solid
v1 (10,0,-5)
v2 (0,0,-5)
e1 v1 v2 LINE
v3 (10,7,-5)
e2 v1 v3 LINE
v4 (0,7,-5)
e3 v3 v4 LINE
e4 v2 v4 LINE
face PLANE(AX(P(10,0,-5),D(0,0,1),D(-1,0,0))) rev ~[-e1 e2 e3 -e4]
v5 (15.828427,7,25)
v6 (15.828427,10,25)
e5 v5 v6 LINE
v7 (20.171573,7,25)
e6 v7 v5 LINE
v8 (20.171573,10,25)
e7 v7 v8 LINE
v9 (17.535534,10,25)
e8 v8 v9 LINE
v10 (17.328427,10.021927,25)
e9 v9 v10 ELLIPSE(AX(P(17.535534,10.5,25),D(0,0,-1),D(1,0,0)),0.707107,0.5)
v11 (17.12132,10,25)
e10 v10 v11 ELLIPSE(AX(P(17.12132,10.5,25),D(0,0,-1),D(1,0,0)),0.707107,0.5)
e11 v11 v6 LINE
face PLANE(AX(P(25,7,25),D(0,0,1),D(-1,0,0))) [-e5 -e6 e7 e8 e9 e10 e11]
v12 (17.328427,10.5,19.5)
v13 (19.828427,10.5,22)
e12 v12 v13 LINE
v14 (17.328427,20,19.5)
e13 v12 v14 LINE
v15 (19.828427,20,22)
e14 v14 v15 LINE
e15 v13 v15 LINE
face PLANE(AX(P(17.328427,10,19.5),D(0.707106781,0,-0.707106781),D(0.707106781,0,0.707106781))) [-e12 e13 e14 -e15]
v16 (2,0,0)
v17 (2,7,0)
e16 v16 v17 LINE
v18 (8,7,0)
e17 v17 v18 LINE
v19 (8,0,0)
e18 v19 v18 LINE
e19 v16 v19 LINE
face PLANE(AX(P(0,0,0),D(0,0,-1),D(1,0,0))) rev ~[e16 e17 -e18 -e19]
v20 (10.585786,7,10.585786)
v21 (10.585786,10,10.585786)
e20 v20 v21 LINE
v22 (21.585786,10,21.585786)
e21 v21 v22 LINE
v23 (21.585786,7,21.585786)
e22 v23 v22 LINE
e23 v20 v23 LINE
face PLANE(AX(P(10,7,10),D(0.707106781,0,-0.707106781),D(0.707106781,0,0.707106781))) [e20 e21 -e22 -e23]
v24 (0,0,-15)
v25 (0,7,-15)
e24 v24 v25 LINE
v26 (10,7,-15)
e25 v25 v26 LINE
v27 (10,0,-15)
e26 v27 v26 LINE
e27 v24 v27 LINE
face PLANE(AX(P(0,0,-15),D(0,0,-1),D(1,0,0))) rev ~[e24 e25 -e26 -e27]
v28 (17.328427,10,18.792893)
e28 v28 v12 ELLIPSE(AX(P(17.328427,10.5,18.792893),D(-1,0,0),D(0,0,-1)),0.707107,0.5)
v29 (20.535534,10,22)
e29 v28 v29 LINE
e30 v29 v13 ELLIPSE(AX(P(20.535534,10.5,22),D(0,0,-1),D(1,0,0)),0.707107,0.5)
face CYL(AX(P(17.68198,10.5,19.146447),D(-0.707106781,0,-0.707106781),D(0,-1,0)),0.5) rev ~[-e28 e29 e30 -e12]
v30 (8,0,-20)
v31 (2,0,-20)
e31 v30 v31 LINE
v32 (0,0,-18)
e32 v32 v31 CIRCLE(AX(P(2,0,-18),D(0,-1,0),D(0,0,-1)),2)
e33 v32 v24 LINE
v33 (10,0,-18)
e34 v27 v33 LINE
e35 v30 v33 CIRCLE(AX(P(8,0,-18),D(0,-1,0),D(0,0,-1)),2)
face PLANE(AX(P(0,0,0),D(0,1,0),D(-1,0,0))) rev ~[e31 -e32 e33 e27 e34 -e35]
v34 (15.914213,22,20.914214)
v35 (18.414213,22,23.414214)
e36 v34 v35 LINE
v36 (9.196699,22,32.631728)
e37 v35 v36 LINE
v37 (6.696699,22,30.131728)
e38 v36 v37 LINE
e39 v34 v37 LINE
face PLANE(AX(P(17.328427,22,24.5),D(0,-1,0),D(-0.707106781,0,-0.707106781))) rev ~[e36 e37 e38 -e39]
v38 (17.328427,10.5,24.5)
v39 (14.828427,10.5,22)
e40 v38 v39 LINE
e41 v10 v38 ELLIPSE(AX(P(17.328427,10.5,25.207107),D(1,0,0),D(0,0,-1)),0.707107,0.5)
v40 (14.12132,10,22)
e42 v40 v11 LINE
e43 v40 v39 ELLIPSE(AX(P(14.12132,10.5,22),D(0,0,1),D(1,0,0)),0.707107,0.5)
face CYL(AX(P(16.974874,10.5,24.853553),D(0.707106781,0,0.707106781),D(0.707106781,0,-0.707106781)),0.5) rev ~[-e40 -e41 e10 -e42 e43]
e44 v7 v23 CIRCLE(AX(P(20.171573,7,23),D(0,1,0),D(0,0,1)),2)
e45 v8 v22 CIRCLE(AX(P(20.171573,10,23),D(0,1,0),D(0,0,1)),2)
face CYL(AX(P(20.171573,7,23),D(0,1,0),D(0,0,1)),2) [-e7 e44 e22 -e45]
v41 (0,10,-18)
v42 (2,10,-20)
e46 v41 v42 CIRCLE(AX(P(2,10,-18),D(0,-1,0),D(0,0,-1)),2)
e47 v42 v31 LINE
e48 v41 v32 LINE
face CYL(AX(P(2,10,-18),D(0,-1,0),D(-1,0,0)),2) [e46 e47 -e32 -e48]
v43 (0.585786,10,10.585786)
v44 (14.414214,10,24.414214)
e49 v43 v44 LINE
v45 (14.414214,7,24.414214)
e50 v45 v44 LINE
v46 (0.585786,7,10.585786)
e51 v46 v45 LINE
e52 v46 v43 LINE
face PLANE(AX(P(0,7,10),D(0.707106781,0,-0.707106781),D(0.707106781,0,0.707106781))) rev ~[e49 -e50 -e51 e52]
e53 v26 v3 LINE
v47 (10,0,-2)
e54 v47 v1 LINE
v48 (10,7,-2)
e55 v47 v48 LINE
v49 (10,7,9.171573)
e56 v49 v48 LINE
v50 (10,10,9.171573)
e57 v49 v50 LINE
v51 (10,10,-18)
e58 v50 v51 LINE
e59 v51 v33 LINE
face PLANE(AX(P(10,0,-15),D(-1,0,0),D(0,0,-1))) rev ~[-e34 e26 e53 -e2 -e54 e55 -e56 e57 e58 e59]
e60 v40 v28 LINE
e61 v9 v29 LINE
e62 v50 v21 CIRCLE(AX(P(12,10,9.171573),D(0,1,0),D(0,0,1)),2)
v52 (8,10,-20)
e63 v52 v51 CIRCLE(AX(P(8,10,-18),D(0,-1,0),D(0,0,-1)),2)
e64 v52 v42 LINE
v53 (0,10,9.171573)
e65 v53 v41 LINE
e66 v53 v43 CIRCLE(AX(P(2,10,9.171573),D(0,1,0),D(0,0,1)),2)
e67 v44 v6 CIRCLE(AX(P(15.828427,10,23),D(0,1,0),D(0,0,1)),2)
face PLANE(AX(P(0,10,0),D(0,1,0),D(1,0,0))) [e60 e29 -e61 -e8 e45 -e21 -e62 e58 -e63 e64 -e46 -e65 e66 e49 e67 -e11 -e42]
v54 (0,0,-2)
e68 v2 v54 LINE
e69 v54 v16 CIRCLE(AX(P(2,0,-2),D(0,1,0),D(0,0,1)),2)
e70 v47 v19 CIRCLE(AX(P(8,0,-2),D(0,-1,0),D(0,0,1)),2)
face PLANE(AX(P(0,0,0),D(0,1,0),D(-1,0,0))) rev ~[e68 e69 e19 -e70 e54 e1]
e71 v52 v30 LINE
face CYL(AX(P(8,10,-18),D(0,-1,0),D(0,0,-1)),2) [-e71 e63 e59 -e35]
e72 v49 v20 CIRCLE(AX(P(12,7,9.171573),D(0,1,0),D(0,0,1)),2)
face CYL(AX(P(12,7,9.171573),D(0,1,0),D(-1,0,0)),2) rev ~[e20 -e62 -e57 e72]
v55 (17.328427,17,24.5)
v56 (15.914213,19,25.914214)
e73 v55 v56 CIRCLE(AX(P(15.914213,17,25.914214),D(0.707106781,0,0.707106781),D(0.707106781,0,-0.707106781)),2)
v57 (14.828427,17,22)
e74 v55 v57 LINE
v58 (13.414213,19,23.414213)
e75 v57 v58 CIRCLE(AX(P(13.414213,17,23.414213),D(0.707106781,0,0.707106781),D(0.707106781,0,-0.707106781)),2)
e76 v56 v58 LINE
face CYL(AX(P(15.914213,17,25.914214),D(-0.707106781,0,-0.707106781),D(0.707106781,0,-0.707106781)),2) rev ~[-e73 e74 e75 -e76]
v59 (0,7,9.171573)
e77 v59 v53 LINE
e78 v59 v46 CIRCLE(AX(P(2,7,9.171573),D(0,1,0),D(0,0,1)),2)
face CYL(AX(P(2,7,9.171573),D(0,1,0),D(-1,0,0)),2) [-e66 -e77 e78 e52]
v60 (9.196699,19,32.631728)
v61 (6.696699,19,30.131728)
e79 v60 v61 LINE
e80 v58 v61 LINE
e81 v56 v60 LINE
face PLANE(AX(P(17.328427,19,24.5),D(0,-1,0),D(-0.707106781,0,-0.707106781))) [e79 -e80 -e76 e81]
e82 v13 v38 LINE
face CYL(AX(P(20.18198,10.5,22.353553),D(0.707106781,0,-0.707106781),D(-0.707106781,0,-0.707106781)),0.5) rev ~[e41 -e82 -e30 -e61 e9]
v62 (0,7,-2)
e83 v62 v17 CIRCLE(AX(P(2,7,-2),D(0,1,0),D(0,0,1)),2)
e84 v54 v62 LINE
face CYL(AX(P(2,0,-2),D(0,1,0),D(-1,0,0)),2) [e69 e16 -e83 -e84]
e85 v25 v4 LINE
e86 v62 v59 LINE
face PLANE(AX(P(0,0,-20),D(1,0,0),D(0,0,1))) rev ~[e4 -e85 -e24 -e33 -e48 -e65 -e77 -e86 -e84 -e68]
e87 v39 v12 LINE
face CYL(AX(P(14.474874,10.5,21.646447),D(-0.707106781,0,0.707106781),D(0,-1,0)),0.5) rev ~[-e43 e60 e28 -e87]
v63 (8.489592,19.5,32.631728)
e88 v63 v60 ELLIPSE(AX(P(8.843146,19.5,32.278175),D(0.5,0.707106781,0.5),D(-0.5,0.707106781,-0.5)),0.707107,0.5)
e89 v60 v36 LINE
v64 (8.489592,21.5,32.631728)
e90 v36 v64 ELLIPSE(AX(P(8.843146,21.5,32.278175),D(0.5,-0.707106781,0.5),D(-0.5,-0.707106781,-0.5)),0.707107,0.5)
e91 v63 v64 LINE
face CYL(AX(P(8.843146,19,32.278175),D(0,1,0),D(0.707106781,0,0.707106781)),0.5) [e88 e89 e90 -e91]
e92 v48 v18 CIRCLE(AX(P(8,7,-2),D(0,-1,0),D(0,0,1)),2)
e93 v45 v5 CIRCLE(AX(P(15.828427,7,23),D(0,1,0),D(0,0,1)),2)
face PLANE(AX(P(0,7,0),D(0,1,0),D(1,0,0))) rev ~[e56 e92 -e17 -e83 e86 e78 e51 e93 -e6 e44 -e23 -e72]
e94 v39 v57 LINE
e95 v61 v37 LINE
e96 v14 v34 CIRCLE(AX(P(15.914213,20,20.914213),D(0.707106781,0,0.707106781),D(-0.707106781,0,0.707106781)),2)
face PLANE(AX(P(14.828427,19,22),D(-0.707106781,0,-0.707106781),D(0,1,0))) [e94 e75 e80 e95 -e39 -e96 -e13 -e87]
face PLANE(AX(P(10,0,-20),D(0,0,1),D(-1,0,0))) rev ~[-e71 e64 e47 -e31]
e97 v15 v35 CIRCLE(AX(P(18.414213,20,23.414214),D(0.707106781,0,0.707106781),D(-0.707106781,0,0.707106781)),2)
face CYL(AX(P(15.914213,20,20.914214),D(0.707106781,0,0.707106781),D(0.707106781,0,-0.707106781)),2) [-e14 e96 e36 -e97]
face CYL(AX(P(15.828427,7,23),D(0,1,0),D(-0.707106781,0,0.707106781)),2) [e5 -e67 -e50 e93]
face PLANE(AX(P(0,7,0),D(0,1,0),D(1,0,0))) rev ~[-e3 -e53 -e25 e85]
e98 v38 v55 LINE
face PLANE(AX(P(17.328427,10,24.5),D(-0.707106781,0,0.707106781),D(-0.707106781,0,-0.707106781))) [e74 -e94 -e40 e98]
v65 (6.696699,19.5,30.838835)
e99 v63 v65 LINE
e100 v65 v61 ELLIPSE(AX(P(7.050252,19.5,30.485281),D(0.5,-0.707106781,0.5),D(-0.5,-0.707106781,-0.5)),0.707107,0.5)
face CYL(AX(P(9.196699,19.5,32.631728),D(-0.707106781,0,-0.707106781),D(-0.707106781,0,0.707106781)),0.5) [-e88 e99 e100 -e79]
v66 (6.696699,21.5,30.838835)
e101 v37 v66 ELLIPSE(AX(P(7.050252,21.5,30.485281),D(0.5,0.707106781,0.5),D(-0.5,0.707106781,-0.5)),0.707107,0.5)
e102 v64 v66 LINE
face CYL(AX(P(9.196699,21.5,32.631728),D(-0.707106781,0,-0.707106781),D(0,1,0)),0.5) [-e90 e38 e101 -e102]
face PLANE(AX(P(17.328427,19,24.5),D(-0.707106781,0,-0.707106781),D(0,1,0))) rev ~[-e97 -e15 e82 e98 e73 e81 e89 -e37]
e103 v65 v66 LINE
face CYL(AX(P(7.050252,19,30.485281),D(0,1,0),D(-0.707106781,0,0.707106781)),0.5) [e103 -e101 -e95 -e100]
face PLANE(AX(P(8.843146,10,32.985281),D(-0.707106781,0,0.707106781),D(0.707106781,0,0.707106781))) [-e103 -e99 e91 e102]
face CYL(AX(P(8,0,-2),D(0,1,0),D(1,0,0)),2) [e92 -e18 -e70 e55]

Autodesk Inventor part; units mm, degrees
ref_plane "YZ Plane" through (0, 0, 0) normal (1, 0, 0) x (0, 1, 0)
ref_plane "XZ Plane" through (0, 0, 0) normal (0, 1, 0) x (-1, 0, 0)
ref_plane "XY Plane" through (0, 0, 0) normal (0, 0, 1) x (1, 0, 0)
sketch "Náčrt1" plane through (0, 0, 0) normal (0, 1, 0) x (-1, 0, 0)
  line L0 (0, 0) -> (-10, 0)
  line L1 (-10, 0) -> (-10, -5)
  line L2 (-10, -5) -> (0, -5)
  line L3 (0, -5) -> (0, 0)
  line L4 (0, -15) -> (-10, -15)
  line L5 (-10, -15) -> (-10, -20)
  line L6 (-10, -20) -> (0, -20)
  line L7 (0, -20) -> (0, -15)
  dimension "d0" = 10
  dimension "d1" = 5
  dimension "d2" = 5
  dimension "d3" = 10
extrude "Vysunutí1" add sketch "Náčrt1" along normal blind 7
sketch "Náčrt2" plane through (0, 7, 0) normal (0, 1, 0) x (1, 0, 0)
  line L0 (0, 0) -> (10, 0)
  line L1 (10, 0) -> (10, 20)
  line L2 (10, 20) -> (0, 20)
  line L3 (0, 20) -> (0, 0)
  line L4 (10, 0) -> (10, 5) projected
  line L5 (10, 0) -> (0, 0)
  line L6 (0, 0) -> (0, -10)
  line L7 (0, -10) -> (10, -10)
  line L8 (10, -10) -> (10, 0)
  line L9 (10, -10) -> (25, -25)
  line L10 (0, -10) -> (15, -25)
  line L11 (25, -25) -> (15, -25)
  dimension "d6" = 10
  dimension "d7" = 10
  dimension "d8" = 135
  dimension "d9" = 15
  dimension "d10" = 15
extrude "Vysunutí2" add sketch "Náčrt2" along normal blind 3
sketch "Náčrt3" plane through (0, 10, 0) normal (0, 1, 0) x (1, 0, 0)
  line L0 (15, -25) -> (25, -25)
  line L1 (17.328427, -24.5) -> (14.828427, -22)
  line L2 (14.828427, -22) -> (17.328427, -19.5)
  line L3 (17.328427, -19.5) -> (19.828427, -22)
  line L4 (19.828427, -22) -> (17.328427, -24.5)
  line L5 (0, -10) -> (15, -25)
  point P0 (0, 0)
  dimension "d22" = 2.5
  dimension "d23" = 2.5
  dimension "d24" = 0.5
  dimension "d25" = 2
extrude "Vysunutí5" add sketch "Náčrt3" along normal blind 12
sketch "Náčrt5" plane through (17.328427, 10, 24.5) normal (-0.7071068, 0, 0.7071068) x (0.7071068, 0, 0.7071068)
  line L0 (0, 12) -> (-3.535534, 12)
  line L1 (0, 0) -> (0, 12)
  line L2 (-3.535534, 12) -> (0, 12)
  line L3 (0, 12) -> (0, 9)
  line L4 (0, 9) -> (-3.535534, 9)
  line L5 (-3.535534, 9) -> (-3.535534, 12)
  point P0 (-29.577164, -10)
  dimension "d28" = 3
extrude "Vysunutí6" add sketch "Náčrt5" along normal blind 12
fillet "Zaoblení1" radius 2 8 edges at (25, 8.5, 25) (15, 8.5, 25) (10, 8.5, 10) (0, 8.5, 10) (10, 5, -20) (0, 5, -20) (0, 3.5, 0) (10, 3.5, 0)
fillet "Zaoblení2" radius 2 1 edges at (16.0784, 19, 23.25)
fillet "Zaoblení3" radius 0.5 4 edges at (16.0784, 10, 20.75) (16.0784, 10, 23.25) (18.5784, 10, 20.75) (18.5784, 10, 23.25)
fillet "Zaoblení4" radius 2 1 edges at (18.5784, 22, 20.75)
fillet "Zaoblení5" radius 0.5 4 edges at (7.5931, 22, 31.7353) (7.5931, 19, 31.7353) (8.8431, 20.5, 32.9853) (6.3431, 20.5, 30.4853)
equation "\"d10\" = d9"
properties part number "NozzleCleaner"
